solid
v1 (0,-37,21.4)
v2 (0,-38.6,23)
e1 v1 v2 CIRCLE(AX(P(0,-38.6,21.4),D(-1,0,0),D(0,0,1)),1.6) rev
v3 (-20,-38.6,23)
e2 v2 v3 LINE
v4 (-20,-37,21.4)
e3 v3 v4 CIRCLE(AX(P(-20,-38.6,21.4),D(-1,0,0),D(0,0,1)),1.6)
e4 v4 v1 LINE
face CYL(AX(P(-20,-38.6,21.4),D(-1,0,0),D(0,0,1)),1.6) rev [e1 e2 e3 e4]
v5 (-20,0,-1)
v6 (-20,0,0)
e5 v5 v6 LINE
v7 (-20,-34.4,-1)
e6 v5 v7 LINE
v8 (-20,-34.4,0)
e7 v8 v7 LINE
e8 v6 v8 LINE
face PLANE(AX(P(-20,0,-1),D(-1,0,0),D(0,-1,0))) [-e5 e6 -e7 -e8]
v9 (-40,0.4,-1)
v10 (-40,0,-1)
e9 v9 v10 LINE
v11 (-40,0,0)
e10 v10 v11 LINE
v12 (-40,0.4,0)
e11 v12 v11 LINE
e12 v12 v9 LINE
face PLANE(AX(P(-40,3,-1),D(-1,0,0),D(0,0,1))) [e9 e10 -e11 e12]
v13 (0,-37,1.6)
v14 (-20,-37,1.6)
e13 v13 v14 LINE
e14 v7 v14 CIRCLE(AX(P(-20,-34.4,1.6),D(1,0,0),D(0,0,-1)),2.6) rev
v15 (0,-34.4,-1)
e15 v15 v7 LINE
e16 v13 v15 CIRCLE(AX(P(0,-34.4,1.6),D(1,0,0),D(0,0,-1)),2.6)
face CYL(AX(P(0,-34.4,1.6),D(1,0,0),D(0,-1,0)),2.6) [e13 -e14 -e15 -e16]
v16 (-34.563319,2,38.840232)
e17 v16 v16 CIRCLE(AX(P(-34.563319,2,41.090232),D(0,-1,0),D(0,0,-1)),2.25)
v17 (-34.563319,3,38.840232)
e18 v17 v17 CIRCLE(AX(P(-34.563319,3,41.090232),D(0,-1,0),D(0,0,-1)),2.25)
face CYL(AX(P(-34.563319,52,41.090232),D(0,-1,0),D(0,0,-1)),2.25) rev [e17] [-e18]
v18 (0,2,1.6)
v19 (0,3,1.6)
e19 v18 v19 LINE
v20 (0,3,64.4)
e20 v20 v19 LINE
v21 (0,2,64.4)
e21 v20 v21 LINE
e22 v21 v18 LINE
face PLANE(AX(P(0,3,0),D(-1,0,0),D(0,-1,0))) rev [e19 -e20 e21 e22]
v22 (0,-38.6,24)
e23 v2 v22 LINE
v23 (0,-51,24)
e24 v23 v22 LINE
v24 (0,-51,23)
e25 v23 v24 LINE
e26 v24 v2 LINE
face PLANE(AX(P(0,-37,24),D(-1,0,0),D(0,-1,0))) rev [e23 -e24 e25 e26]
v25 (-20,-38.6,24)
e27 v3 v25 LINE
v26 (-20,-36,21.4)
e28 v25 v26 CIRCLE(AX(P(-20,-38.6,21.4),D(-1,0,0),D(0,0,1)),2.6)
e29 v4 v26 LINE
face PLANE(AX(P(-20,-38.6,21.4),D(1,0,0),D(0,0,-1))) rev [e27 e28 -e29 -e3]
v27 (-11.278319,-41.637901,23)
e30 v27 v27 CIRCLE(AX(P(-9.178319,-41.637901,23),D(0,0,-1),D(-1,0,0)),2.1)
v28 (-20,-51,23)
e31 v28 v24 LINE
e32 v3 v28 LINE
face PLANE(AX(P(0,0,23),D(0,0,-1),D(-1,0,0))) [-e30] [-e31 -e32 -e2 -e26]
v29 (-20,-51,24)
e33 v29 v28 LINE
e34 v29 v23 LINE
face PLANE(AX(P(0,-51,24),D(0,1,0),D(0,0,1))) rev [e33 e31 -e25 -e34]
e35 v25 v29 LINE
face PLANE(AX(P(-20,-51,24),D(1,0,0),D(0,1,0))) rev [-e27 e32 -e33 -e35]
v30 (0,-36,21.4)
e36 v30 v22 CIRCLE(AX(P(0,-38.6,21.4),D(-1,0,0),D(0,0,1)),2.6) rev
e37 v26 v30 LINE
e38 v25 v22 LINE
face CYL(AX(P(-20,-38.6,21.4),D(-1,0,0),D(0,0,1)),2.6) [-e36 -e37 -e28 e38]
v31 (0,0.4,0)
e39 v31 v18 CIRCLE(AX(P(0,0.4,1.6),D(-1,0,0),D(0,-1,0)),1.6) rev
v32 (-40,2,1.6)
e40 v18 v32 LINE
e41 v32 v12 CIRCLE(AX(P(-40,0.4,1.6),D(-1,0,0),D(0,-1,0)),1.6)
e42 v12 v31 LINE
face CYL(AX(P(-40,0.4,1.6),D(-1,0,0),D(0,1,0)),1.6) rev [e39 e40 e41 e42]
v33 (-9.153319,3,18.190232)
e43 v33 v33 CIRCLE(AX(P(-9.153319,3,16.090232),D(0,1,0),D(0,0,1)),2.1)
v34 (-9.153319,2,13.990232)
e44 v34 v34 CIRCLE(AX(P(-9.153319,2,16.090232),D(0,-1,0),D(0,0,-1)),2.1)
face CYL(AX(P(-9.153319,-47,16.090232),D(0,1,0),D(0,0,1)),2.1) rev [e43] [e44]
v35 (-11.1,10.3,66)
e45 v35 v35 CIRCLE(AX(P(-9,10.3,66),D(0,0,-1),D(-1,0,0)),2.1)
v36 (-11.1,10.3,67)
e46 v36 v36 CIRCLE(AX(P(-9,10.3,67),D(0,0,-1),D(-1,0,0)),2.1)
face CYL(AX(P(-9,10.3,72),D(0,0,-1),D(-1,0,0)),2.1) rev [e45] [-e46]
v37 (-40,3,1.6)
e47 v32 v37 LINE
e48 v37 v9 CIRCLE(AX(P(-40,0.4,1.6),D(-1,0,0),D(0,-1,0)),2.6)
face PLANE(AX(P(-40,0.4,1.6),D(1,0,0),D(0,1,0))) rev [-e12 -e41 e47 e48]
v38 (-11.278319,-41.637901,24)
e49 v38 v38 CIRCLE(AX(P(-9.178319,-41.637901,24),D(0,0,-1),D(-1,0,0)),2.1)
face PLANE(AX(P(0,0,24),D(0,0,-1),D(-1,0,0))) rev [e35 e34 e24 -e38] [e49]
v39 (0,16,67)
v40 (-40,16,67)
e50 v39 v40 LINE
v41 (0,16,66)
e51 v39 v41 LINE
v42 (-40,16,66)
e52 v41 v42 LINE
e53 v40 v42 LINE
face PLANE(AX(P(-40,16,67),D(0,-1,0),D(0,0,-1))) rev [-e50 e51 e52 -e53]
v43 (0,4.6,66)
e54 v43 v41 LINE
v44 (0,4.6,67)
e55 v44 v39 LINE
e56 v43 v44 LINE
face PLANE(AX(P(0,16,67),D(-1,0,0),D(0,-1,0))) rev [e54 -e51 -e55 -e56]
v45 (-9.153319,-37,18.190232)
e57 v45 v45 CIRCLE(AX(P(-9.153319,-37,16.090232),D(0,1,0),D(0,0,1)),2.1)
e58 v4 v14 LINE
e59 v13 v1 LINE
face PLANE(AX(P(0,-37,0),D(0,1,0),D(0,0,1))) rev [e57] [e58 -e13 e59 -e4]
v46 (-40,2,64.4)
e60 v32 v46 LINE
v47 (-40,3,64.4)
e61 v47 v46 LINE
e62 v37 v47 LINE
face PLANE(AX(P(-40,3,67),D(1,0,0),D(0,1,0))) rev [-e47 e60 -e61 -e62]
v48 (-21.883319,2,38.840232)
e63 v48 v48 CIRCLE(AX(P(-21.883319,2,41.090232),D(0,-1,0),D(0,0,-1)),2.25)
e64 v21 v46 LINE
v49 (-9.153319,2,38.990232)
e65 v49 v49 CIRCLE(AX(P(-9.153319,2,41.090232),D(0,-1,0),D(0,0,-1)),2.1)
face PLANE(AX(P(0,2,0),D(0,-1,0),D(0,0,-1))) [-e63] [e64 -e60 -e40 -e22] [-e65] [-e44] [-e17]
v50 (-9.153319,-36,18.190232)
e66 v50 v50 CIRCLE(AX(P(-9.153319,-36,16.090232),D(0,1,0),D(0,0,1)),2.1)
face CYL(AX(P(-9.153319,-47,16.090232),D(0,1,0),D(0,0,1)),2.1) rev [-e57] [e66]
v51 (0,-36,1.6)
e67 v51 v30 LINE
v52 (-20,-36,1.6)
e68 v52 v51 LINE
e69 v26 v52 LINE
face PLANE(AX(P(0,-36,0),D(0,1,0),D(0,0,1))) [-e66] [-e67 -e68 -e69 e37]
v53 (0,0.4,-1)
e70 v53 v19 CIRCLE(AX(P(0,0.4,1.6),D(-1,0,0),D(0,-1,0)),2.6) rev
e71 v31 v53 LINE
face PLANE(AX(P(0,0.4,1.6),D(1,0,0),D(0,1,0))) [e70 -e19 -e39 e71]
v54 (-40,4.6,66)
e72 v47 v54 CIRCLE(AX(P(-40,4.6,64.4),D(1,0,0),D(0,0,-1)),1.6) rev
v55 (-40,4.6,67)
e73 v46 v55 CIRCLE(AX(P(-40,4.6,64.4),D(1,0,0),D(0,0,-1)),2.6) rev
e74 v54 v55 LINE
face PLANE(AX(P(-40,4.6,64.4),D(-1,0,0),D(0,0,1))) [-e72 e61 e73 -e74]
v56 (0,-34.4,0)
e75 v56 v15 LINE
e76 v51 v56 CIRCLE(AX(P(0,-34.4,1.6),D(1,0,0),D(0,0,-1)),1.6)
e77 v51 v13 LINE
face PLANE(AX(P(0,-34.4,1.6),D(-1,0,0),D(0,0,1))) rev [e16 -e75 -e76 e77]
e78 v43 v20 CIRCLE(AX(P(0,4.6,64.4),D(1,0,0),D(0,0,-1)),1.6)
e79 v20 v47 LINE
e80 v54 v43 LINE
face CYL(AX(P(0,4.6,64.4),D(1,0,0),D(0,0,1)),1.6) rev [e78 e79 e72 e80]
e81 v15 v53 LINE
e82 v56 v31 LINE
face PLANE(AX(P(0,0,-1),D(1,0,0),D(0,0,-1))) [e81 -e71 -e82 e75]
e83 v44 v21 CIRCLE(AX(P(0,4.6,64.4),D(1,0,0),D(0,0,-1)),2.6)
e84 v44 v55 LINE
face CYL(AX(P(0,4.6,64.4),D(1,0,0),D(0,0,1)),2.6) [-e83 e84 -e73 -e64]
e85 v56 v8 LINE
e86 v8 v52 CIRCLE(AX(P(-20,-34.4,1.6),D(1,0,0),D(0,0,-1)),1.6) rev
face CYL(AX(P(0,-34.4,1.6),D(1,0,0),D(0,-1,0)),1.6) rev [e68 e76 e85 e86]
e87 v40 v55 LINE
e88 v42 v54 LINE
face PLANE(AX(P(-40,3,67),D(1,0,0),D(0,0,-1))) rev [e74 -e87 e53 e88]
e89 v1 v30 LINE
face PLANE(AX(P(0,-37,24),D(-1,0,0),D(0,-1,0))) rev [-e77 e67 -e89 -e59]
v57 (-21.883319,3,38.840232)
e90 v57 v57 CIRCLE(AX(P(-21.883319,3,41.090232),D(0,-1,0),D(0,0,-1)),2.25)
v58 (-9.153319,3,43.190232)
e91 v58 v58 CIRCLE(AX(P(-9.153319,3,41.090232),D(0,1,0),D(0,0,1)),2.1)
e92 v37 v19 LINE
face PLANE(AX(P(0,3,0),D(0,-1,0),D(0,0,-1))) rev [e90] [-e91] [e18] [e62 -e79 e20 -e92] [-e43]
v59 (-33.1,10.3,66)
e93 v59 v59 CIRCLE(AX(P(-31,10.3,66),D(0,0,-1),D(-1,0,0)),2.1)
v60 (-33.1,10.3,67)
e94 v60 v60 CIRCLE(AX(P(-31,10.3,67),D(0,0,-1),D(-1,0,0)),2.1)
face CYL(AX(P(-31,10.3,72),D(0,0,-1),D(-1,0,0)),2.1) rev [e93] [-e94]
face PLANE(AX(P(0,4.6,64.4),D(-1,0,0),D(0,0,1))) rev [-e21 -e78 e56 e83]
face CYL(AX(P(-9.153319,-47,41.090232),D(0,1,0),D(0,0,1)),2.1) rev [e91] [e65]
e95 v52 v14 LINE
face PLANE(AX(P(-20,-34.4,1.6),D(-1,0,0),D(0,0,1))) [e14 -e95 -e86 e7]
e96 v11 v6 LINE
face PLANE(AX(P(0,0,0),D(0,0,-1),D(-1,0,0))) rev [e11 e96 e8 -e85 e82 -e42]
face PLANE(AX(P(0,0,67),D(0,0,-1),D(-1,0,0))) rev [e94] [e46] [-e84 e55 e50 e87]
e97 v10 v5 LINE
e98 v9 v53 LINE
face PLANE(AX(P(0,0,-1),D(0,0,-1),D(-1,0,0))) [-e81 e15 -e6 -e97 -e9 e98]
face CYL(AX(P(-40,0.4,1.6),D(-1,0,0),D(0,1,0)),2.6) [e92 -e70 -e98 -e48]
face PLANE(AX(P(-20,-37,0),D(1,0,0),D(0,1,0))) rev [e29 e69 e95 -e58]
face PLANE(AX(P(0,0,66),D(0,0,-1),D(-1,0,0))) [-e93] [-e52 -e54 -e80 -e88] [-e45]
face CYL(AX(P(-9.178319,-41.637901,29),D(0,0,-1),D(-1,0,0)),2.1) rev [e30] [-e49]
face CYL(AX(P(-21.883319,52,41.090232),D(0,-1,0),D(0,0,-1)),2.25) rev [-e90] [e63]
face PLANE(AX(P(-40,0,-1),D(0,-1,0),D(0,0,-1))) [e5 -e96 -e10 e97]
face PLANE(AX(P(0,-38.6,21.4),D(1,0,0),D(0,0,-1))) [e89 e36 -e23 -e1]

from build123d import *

# Parameters (mm, degrees)
BASE_FLANGE1_DEPTH           = 1
EDGE_FLANGE1_STRIP_W         = 7.2
EDGE_FLANGE1_STRIP_H         = 1
EDGE_FLANGE1_STRIP_CUT_DEPTH = 40
EDGE_FLANGE1_DEPTH           = 40
EDGE_FLANGE2_STRIP_W         = 7.2
EDGE_FLANGE2_STRIP_H         = 1
EDGE_FLANGE2_STRIP_CUT_DEPTH = 40
EDGE_FLANGE2_DEPTH           = 40
EDGE_FLANGE3_STRIP_W         = 7.2
EDGE_FLANGE3_STRIP_H         = 1
EDGE_FLANGE3_STRIP_CUT_DEPTH = 20
EDGE_FLANGE3_DEPTH           = 20
EDGE_FLANGE4_STRIP_W         = 7.2
EDGE_FLANGE4_STRIP_H         = 1
EDGE_FLANGE4_STRIP_CUT_DEPTH = 20
EDGE_FLANGE4_DEPTH           = 20
SKETCH18_R                   = 2.1
CUT_EXTRUDE1_DEPTH           = 6
SKETCH19_R                   = 2.1
CUT_EXTRUDE2_DEPTH           = 6
SKETCH20_R                   = 2.1
CUT_EXTRUDE3_DEPTH           = 50
SKETCH21_R                   = 2.25
CUT_EXTRUDE4_DEPTH           = 50


# Sheet-metal steps are written as plain solids
with BuildPart() as part:
    # Sketch1 → Base-Flange1 (new body)
    with BuildSketch(Plane.XY):
        Polygon((0, 0), (0, 3), (-40, 3), (-40, 0), (-20, 0), (-20, -37), (-18.16511543, -37), (0, -37), align=None)
    extrude(amount=-BASE_FLANGE1_DEPTH)

    # Edge-Flange1 strip (across the edge) → Edge-Flange1 strip cut (cut)
    with BuildSketch(Plane(origin=(0, 3, 0), x_dir=(0, -1, 0), z_dir=(-1, 0, 0))):
        with Locations((-1, -0.5)):
            Rectangle(EDGE_FLANGE1_STRIP_W, EDGE_FLANGE1_STRIP_H)
    extrude(amount=EDGE_FLANGE1_STRIP_CUT_DEPTH, mode=Mode.SUBTRACT)

    # Edge-Flange1 section (across the edge) → Edge-Flange1 (add)
    with BuildSketch(Plane(origin=(0, 3, 0), x_dir=(0, -1, 0), z_dir=(-1, 0, 0))):
        with BuildLine():
            Line((0, 1.6), (0, 67))
            Line((0, 67), (1, 67))
            Line((1, 67), (1, 1.6))
            ThreePointArc((1, 1.6), (1.46862915, 0.46862915), (2.6, 0))
            Line((2.6, 0), (2.6, -1))
            ThreePointArc((2.6, -1), (0.761522369, -0.238477631), (0, 1.6))
        make_face()
    extrude(amount=EDGE_FLANGE1_DEPTH)

    # Edge-Flange2 strip (across the edge) → Edge-Flange2 strip cut (cut)
    with BuildSketch(Plane(origin=(-40, 3, 67), x_dir=(0, 0, -1), z_dir=(1, 0, 0))):
        with Locations((-1, -0.5)):
            Rectangle(EDGE_FLANGE2_STRIP_W, EDGE_FLANGE2_STRIP_H)
    extrude(amount=EDGE_FLANGE2_STRIP_CUT_DEPTH, mode=Mode.SUBTRACT)

    # Edge-Flange2 section (across the edge) → Edge-Flange2 (add)
    with BuildSketch(Plane(origin=(-40, 3, 67), x_dir=(0, 0, -1), z_dir=(1, 0, 0))):
        with BuildLine():
            Line((0, 1.6), (0, 13))
            Line((0, 13), (1, 13))
            Line((1, 13), (1, 1.6))
            ThreePointArc((1, 1.6), (1.46862915, 0.46862915), (2.6, 0))
            Line((2.6, 0), (2.6, -1))
            ThreePointArc((2.6, -1), (0.761522369, -0.238477631), (0, 1.6))
        make_face()
    extrude(amount=EDGE_FLANGE2_DEPTH)

    # Edge-Flange3 strip (across the edge) → Edge-Flange3 strip cut (cut)
    with BuildSketch(Plane(origin=(-20, -37, 0), x_dir=(0, 1, 0), z_dir=(1, 0, 0))):
        with Locations((-1, -0.5)):
            Rectangle(EDGE_FLANGE3_STRIP_W, EDGE_FLANGE3_STRIP_H)
    extrude(amount=EDGE_FLANGE3_STRIP_CUT_DEPTH, mode=Mode.SUBTRACT)

    # Edge-Flange3 section (across the edge) → Edge-Flange3 (add)
    with BuildSketch(Plane(origin=(-20, -37, 0), x_dir=(0, 1, 0), z_dir=(1, 0, 0))):
        with BuildLine():
            Line((0, 1.6), (0, 24))
            Line((0, 24), (1, 24))
            Line((1, 24), (1, 1.6))
            ThreePointArc((1, 1.6), (1.46862915, 0.46862915), (2.6, 0))
            Line((2.6, 0), (2.6, -1))
            ThreePointArc((2.6, -1), (0.761522369, -0.238477631), (0, 1.6))
        make_face()
    extrude(amount=EDGE_FLANGE3_DEPTH)

    # Edge-Flange4 strip (across the edge) → Edge-Flange4 strip cut (cut)
    with BuildSketch(Plane(origin=(0, -37, 24), x_dir=(0, 0, -1), z_dir=(-1, 0, 0))):
        with Locations((-1, -0.5)):
            Rectangle(EDGE_FLANGE4_STRIP_W, EDGE_FLANGE4_STRIP_H)
    extrude(amount=EDGE_FLANGE4_STRIP_CUT_DEPTH, mode=Mode.SUBTRACT)

    # Edge-Flange4 section (across the edge) → Edge-Flange4 (add)
    with BuildSketch(Plane(origin=(0, -37, 24), x_dir=(0, 0, -1), z_dir=(-1, 0, 0))):
        with BuildLine():
            Line((0, 1.6), (0, 14))
            Line((0, 14), (1, 14))
            Line((1, 14), (1, 1.6))
            ThreePointArc((1, 1.6), (1.46862915, 0.46862915), (2.6, 0))
            Line((2.6, 0), (2.6, -1))
            ThreePointArc((2.6, -1), (0.761522369, -0.238477631), (0, 1.6))
        make_face()
    extrude(amount=EDGE_FLANGE4_DEPTH)

    # Sketch18 → Cut-Extrude1 (cut)
    with BuildSketch(Plane(origin=(0, 0, 66), x_dir=(-1, 0, 0), z_dir=(0, 0, -1))):
        with Locations((9, 10.3)):
            Circle(SKETCH18_R)
        with Locations((31, 10.3)):
            Circle(SKETCH18_R)
    extrude(amount=-CUT_EXTRUDE1_DEPTH, mode=Mode.SUBTRACT)

    # Sketch19 → Cut-Extrude2 (cut)
    with BuildSketch(Plane(origin=(0, 0, 23), x_dir=(-1, 0, 0), z_dir=(0, 0, -1))):
        with Locations((9.178318955, -41.637901039)):
            Circle(SKETCH19_R)
    extrude(amount=-CUT_EXTRUDE2_DEPTH, mode=Mode.SUBTRACT)

    # Sketch20 → Cut-Extrude3 (cut)
    with BuildSketch(Plane(origin=(0, 3, 0), x_dir=(1, 0, 0), z_dir=(0, 1, 0))):
        with Locations(Location((-9.153318955, -41.090231637, 0), (0, 0, 270))):
            Circle(SKETCH20_R)
        with Locations(Location((-9.153318955, -16.090231637, 0), (0, 0, 270))):
            Circle(SKETCH20_R)
    extrude(amount=-CUT_EXTRUDE3_DEPTH, mode=Mode.SUBTRACT)

    # Sketch21 → Cut-Extrude4 (cut)
    with BuildSketch(Plane.XZ.offset(-2)):
        with Locations(Location((-21.883318955, 41.090231637, 0), (0, 0, 270))):
            Circle(SKETCH21_R)
        with Locations(Location((-34.563318955, 41.090231637, 0), (0, 0, 270))):
            Circle(SKETCH21_R)
    extrude(amount=-CUT_EXTRUDE4_DEPTH, mode=Mode.SUBTRACT)


solid = part.part
